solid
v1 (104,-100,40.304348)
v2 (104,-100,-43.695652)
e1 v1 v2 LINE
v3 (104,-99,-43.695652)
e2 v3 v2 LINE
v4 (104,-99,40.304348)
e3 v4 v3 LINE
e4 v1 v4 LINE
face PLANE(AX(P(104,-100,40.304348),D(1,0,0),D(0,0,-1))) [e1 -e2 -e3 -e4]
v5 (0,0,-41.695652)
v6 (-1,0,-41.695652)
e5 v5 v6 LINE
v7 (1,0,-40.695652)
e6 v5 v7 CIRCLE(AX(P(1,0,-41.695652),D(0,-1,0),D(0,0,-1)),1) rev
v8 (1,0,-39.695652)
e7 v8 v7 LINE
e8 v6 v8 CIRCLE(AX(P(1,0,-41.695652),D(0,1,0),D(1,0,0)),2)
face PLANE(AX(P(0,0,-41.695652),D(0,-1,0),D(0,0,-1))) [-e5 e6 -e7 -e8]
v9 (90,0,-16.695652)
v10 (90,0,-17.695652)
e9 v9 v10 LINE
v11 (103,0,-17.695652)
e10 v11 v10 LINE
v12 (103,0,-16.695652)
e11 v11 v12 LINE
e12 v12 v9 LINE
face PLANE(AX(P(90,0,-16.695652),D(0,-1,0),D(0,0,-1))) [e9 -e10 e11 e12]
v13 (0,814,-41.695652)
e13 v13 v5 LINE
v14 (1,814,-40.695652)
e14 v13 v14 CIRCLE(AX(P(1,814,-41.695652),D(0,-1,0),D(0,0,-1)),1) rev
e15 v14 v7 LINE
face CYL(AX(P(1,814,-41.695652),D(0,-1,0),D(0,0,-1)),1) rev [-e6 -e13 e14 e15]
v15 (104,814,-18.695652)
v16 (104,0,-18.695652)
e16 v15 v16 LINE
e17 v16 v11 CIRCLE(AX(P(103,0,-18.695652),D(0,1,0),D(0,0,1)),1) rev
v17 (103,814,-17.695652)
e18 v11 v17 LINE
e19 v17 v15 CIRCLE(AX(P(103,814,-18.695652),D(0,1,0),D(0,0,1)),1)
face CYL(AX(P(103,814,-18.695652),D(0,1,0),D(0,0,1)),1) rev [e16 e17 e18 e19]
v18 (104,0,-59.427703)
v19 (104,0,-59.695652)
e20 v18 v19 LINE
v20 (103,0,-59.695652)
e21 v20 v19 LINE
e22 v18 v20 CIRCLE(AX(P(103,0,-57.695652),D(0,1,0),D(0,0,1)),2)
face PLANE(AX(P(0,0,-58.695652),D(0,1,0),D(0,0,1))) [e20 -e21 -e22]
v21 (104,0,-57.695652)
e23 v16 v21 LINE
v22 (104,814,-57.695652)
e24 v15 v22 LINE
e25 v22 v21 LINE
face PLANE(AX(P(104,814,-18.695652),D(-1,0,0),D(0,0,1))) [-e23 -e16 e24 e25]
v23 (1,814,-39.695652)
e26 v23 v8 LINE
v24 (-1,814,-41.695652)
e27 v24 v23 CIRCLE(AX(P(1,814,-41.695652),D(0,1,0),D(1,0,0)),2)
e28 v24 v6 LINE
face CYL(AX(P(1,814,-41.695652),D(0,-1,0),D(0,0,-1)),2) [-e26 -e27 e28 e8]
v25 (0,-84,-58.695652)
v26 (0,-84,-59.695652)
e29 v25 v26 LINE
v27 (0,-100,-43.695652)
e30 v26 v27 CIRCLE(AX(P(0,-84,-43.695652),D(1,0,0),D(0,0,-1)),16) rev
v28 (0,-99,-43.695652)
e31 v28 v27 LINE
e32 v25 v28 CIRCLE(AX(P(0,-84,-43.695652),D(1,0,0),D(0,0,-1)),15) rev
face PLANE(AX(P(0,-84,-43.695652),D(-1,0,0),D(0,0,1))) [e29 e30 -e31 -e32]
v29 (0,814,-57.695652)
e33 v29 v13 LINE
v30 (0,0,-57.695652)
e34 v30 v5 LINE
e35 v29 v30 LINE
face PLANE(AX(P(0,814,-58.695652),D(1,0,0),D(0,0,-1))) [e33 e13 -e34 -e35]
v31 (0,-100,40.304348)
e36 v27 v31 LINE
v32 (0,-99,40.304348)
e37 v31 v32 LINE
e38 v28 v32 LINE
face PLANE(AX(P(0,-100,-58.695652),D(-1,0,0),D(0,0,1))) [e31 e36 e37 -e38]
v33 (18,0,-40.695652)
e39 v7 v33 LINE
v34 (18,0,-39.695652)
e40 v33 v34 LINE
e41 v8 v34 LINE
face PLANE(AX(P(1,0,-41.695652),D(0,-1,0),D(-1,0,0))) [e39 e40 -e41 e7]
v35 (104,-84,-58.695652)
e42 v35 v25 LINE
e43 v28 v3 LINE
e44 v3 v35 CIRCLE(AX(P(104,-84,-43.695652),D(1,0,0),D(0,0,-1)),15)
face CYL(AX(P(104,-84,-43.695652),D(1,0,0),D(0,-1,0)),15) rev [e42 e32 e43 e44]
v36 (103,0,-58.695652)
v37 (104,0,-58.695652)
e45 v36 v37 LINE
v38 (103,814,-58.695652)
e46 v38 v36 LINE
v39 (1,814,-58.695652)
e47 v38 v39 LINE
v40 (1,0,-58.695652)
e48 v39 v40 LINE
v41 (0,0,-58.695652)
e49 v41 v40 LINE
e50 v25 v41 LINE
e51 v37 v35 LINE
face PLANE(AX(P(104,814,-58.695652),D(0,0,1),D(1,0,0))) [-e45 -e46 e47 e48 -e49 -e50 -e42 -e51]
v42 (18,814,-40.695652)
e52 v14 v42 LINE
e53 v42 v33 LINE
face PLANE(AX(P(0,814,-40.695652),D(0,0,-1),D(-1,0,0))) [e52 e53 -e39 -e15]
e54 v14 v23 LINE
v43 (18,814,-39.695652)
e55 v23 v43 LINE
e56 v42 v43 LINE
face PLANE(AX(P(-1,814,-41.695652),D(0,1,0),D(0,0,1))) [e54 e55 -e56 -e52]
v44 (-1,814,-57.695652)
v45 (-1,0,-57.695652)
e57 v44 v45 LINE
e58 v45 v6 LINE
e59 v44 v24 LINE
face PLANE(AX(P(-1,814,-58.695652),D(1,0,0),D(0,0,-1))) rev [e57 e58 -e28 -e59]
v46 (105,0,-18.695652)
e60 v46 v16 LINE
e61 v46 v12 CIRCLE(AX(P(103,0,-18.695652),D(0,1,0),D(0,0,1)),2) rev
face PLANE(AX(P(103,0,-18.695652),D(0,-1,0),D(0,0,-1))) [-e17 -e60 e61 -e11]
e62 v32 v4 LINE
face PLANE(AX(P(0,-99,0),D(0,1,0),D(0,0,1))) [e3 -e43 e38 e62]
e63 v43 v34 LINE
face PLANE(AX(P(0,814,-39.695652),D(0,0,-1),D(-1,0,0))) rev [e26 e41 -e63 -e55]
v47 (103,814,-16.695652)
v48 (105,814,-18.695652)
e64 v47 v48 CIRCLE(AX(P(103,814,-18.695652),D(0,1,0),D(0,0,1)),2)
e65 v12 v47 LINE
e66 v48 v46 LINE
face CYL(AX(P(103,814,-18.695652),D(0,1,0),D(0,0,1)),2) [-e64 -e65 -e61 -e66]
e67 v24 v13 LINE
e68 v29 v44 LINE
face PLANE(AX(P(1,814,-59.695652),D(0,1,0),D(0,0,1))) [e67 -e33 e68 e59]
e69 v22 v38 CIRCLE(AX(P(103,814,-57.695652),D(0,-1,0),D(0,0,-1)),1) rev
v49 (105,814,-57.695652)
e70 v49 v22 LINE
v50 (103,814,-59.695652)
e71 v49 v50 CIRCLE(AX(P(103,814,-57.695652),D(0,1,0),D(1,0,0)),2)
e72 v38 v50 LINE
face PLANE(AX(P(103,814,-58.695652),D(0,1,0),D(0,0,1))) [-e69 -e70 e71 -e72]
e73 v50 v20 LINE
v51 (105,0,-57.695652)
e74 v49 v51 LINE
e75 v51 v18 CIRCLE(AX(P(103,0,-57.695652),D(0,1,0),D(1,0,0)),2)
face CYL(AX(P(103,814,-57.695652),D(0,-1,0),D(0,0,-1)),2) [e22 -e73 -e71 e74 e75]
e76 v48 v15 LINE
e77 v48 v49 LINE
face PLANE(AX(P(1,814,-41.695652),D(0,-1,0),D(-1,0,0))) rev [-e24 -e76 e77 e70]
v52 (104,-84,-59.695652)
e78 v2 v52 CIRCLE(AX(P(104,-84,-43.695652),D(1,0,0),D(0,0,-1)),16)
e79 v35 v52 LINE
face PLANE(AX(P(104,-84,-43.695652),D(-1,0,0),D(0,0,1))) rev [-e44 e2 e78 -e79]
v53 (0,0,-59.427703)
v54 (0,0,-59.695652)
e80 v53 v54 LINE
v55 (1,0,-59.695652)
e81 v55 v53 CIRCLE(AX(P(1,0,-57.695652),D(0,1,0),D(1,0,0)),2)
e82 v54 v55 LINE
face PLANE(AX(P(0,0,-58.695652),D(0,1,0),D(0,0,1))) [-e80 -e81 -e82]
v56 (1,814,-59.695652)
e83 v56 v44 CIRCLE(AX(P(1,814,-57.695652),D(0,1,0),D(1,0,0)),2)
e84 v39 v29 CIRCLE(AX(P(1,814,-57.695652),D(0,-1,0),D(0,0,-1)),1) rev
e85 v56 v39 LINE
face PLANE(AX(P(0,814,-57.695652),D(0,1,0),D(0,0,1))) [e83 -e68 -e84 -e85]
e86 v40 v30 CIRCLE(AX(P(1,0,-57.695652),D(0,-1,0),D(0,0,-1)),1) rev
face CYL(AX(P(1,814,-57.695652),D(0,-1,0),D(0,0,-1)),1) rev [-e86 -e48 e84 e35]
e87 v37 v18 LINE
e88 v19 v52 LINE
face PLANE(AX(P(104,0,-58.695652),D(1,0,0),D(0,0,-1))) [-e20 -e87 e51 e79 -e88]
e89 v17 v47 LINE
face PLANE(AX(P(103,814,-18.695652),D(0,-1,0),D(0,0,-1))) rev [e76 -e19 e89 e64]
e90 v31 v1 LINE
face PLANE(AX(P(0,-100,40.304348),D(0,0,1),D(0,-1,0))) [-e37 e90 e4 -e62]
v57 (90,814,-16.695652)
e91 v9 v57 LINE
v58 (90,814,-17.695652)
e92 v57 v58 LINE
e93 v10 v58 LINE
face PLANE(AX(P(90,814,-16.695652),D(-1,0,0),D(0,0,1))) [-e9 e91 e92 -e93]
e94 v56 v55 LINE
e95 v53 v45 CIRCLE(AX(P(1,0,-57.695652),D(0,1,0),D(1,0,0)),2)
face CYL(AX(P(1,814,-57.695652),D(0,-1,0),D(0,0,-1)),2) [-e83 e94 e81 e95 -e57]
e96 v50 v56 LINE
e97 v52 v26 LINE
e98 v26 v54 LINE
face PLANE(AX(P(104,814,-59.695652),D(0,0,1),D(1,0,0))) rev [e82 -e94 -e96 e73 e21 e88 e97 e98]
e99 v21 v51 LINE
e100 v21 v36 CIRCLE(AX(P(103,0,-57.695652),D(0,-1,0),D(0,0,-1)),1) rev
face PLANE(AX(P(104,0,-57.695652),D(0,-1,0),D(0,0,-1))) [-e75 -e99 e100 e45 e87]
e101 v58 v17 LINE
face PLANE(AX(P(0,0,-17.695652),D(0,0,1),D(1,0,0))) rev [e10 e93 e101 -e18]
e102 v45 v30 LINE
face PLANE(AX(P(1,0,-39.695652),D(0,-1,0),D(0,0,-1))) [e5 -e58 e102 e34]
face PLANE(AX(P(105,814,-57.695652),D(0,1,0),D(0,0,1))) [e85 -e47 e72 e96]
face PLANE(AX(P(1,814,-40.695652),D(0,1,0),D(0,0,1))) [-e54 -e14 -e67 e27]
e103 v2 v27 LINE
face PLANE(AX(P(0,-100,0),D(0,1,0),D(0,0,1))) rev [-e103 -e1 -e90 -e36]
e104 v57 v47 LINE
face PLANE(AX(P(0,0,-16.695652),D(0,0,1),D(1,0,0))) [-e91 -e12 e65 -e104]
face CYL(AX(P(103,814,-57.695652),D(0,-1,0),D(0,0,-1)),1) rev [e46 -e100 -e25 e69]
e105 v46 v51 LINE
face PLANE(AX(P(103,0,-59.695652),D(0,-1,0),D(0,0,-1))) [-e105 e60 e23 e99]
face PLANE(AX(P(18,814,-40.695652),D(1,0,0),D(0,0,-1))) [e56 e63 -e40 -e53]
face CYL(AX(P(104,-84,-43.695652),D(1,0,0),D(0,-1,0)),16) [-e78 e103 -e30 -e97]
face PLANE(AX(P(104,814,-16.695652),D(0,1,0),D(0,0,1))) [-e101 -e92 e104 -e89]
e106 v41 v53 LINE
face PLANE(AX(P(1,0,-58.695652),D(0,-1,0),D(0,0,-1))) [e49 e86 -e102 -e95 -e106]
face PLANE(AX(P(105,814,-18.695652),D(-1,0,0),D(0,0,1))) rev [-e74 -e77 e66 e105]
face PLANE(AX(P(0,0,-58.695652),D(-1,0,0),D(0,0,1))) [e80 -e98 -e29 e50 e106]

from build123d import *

# Parameters (mm, degrees)
BASE_FLANGE1_DEPTH = 814
EDGE_FLANGE1_DEPTH = 814
SKETCH15_W         = 104
SKETCH15_H         = 84
TAB1_DEPTH         = 1
EDGE_FLANGE2_DEPTH = 104


# Sheet-metal steps are written as plain solids
with BuildPart() as part:
    # Sketch1 → Base-Flange1 (new body)
    with BuildSketch(Plane(origin=(0, 0, 0), x_dir=(1, 0, 0), z_dir=(0, 1, 0))):
        with BuildLine():
            Line((104, 18.695652174), (104, 57.695652174))
            ThreePointArc((104, 57.695652174), (103.707106781, 58.402758955), (103, 58.695652174))
            Line((103, 58.695652174), (1, 58.695652174))
            ThreePointArc((1, 58.695652174), (0.292893219, 58.402758955), (0, 57.695652174))
            Line((0, 57.695652174), (0, 41.695652174))
            ThreePointArc((0, 41.695652174), (0.292893219, 40.988545393), (1, 40.695652174))
            Line((1, 40.695652174), (18, 40.695652174))
            Line((18, 40.695652174), (18, 39.695652174))
            Line((18, 39.695652174), (1, 39.695652174))
            ThreePointArc((1, 39.695652174), (-0.414213562, 40.281438612), (-1, 41.695652174))
            Line((-1, 41.695652174), (-1, 57.695652174))
            ThreePointArc((-1, 57.695652174), (-0.414213562, 59.109865736), (1, 59.695652174))
            Line((1, 59.695652174), (103, 59.695652174))
            ThreePointArc((103, 59.695652174), (104.414213562, 59.109865736), (105, 57.695652174))
            Line((105, 57.695652174), (105, 18.695652174))
            Line((105, 18.695652174), (104, 18.695652174))
        make_face()
    extrude(amount=BASE_FLANGE1_DEPTH)

    # Edge-Flange1 section (across the edge) → Edge-Flange1 (add)
    with BuildSketch(Plane(origin=(104, 0, -17.695652174), x_dir=(0, 0, -1), z_dir=(0, 1, 0))):
        with BuildLine():
            Line((-1, 1), (-1, 14))
            Line((-1, 14), (0, 14))
            Line((0, 14), (0, 1))
            ThreePointArc((0, 1), (0.292893219, 0.292893219), (1, 0))
            Line((1, 0), (1, -1))
            ThreePointArc((1, -1), (-0.414213562, -0.414213562), (-1, 1))
        make_face()
    extrude(amount=EDGE_FLANGE1_DEPTH)

    # Sketch15 → Tab1 (add)
    with BuildSketch(Plane(origin=(0, 0, -59.695652174), x_dir=(-1, 0, 0), z_dir=(0, 0, -1))):
        with Locations((-52, -42)):
            Rectangle(SKETCH15_W, SKETCH15_H)
    extrude(amount=-TAB1_DEPTH)

    # Edge-Flange2 section (across the edge) → Edge-Flange2 (add)
    with BuildSketch(Plane(origin=(0, -99, -58.695652174), x_dir=(0, 1, 0), z_dir=(1, 0, 0))):
        with BuildLine():
            Line((-1, 15), (-1, 99))
            Line((-1, 99), (0, 99))
            Line((0, 99), (0, 15))
            ThreePointArc((0, 15), (4.393398282, 4.393398282), (15, 0))
            Line((15, 0), (15, -1))
            ThreePointArc((15, -1), (3.686291501, 3.686291501), (-1, 15))
        make_face()
    extrude(amount=EDGE_FLANGE2_DEPTH)


solid = part.part
